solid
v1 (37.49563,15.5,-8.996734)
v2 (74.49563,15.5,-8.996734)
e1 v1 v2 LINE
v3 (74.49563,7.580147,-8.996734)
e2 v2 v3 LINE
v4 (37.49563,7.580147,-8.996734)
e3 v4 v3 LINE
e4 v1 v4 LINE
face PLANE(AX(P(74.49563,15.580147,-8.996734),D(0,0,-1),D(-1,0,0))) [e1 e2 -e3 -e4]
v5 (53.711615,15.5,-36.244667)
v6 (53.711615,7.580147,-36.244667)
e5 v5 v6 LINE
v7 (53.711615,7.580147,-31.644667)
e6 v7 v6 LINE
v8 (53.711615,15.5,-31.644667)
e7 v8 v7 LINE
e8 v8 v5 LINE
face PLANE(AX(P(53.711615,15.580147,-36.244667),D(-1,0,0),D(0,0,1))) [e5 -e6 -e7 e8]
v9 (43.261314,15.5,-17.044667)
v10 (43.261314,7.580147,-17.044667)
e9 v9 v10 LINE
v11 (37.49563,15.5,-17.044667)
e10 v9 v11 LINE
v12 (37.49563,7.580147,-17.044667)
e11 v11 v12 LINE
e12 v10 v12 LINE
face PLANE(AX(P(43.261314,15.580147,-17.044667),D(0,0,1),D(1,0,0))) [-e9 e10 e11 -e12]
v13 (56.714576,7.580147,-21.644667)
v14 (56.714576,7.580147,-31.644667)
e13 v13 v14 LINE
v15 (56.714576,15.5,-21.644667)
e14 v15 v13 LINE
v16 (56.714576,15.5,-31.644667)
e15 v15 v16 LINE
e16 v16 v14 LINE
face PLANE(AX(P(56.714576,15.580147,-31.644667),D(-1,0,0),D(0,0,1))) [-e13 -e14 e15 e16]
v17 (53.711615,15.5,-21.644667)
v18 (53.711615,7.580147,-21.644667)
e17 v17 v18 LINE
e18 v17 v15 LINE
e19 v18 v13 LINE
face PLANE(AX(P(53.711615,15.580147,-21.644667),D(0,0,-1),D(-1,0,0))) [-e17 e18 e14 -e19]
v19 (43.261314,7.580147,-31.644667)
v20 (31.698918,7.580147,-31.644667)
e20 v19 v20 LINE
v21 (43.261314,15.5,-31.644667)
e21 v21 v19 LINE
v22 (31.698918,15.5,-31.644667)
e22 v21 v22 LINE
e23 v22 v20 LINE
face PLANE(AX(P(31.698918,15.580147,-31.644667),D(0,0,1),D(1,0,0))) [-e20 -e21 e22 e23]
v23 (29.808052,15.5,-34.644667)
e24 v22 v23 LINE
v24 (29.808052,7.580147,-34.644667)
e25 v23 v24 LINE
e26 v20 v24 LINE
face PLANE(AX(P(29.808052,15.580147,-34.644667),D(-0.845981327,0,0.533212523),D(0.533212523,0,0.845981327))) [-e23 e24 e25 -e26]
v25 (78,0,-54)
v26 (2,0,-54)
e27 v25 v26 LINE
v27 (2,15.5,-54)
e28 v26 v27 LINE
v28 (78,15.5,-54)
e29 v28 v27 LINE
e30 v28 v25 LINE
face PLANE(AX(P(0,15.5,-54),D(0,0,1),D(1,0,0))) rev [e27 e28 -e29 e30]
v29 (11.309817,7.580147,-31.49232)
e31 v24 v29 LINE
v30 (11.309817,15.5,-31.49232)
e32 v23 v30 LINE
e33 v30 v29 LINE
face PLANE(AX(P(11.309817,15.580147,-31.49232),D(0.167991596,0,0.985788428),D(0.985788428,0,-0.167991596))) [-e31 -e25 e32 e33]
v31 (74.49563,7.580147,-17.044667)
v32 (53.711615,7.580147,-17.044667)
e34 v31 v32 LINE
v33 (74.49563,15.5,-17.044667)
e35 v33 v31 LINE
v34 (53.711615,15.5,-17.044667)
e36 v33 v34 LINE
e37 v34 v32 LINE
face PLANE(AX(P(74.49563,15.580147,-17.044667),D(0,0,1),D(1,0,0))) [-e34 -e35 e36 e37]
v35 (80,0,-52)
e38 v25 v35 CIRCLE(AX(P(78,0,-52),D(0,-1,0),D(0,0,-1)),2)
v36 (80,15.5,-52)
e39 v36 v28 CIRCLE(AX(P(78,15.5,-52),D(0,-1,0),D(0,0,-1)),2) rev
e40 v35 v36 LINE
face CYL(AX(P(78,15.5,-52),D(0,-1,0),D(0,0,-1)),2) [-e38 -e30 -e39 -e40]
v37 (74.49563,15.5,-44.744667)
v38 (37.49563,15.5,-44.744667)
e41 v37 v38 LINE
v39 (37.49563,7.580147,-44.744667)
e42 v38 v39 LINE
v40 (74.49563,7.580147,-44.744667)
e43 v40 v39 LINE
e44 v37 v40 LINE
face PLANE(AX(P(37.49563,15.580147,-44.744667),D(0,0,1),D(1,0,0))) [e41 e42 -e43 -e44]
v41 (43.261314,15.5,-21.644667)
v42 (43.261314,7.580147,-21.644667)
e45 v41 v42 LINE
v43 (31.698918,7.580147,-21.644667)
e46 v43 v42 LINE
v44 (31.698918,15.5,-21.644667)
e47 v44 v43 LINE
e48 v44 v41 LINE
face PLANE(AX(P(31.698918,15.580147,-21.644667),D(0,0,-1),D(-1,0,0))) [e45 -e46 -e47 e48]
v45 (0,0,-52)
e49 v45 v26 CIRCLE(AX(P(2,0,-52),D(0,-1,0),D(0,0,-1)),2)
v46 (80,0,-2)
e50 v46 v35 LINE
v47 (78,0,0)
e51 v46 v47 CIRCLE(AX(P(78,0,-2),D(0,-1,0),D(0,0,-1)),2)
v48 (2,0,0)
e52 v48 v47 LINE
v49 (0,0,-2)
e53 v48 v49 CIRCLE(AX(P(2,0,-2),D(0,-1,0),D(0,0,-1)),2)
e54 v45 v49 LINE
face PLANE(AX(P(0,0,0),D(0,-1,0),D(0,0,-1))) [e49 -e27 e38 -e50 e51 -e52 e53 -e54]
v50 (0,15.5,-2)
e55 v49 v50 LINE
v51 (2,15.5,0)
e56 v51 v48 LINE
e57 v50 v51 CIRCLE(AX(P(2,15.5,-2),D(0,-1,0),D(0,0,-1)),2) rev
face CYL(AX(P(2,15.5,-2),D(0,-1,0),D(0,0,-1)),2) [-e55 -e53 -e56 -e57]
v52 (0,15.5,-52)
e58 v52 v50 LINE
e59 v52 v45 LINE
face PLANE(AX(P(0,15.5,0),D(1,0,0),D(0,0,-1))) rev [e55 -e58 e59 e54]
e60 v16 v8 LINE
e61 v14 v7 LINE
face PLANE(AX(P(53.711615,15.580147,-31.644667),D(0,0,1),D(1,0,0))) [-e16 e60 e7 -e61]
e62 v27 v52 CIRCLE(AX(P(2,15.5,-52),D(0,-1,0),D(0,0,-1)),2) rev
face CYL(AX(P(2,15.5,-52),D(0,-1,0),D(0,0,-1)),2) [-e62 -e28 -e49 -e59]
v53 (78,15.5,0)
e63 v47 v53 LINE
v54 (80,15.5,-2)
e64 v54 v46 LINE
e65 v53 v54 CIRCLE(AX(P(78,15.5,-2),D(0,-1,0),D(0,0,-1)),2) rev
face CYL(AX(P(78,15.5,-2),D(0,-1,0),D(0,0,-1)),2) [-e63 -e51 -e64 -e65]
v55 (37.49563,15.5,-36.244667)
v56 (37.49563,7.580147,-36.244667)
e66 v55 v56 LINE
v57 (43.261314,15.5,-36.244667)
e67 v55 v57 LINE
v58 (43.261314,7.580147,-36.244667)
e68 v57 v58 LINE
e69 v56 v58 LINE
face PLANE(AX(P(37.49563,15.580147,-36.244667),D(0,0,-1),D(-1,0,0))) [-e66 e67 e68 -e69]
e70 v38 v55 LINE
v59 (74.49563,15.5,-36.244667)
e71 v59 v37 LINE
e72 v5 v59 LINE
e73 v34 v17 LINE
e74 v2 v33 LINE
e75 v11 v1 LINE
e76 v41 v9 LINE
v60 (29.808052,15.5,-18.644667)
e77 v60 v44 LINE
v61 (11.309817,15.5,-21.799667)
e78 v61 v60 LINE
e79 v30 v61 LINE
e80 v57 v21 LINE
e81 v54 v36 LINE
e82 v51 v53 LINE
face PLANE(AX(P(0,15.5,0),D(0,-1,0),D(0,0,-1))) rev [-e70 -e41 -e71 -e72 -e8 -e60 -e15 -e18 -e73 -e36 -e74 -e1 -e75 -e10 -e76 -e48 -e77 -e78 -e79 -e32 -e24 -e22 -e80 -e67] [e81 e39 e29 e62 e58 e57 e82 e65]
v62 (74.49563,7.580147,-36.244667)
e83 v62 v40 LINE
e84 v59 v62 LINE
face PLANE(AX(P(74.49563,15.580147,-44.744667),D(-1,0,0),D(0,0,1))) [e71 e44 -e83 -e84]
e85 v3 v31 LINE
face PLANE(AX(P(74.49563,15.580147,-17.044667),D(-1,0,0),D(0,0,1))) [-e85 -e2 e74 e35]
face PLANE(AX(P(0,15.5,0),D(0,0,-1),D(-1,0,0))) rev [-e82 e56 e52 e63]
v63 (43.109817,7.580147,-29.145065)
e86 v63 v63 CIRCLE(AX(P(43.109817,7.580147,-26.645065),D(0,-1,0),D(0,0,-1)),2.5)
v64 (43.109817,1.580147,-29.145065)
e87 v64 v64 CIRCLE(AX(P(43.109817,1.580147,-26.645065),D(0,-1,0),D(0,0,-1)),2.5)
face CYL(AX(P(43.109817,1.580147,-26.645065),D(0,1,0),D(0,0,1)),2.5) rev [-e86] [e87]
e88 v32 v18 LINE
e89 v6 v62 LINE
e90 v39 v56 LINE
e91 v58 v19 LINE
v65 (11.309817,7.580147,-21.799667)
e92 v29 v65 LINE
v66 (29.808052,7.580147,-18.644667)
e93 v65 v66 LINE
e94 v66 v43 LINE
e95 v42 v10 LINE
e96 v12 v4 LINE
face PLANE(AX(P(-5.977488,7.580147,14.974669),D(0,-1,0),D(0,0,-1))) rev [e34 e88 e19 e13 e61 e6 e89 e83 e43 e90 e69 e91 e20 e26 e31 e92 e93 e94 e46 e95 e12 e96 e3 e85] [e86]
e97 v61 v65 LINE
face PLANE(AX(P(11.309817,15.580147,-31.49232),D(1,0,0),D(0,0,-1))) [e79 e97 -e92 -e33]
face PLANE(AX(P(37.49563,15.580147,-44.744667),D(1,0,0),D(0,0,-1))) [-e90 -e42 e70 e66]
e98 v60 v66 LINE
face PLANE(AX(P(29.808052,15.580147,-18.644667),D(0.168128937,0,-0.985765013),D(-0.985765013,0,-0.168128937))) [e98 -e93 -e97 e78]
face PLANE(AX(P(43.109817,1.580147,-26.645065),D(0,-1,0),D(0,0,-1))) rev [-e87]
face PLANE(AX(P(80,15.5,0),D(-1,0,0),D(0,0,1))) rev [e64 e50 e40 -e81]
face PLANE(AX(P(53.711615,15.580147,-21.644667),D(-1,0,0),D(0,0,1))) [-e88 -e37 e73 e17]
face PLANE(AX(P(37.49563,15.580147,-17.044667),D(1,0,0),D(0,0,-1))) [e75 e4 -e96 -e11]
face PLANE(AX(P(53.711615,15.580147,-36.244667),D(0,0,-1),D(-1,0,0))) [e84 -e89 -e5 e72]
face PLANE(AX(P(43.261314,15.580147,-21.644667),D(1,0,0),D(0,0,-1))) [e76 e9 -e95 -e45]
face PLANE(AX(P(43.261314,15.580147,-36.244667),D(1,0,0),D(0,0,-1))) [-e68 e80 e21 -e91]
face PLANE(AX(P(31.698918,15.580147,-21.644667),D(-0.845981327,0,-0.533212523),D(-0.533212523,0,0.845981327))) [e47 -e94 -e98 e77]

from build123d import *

# Parameters (mm, degrees)
SKETCH1_W           = 80
SKETCH1_H           = 54
BOSS_EXTRUDE2_DEPTH = 15.5
FILLET1_R           = 2
Y_WING_START        = -26.76167351
Y_WING_DEPTH        = 8
Y_WING_START_2      = -32.76167351
Y_WING_2_OUTLINE_R  = 2.5
Y_WING_2_DEPTH      = 6


with BuildPart() as part:
    # Sketch1 → Boss-Extrude2 (new body)
    with BuildSketch(Plane(origin=(0, 0, 0), x_dir=(1, 0, 0), z_dir=(0, 1, 0))):
        with Locations((40, 27)):
            Rectangle(SKETCH1_W, SKETCH1_H)
    extrude(amount=BOSS_EXTRUDE2_DEPTH)

    # Fillet1
    fillet1_edges = [part.edges().sort_by_distance(p)[0] for p in [
        (0, 7.75, -54),
        (80, 7.75, -54),
        (80, 7.75, 0),
        (0, 7.75, 0),
    ]]
    fillet(fillet1_edges, radius=FILLET1_R)


with BuildPart() as body_2:
    # Y-Wing: read off the stored shape, not the designer's step
    # Y-Wing outline → Y-Wing (new body)
    with BuildSketch(Plane(origin=(0, 0, 0), x_dir=(1, 0, 0), z_dir=(0, 1, 0)).offset(Y_WING_START)):
        Polygon((-37.998848216, 80.77793428), (-49.561243891, 80.77793428), (-51.452110178, 83.77793428), (-69.950345376, 80.625586413), (-69.950345376, 70.93293428), (-51.452110178, 67.77793428), (-49.561243891, 70.77793428), (-37.998848216, 70.77793428), (-37.998848216, 66.17793428), (-43.764531914, 66.17793428), (-43.764531914, 58.130000785), (-6.764531914, 58.130000785), (-6.764531914, 66.17793428), (-27.548546514, 66.17793428), (-27.548546514, 70.77793428), (-24.545586254, 70.77793428), (-24.545586254, 80.77793428), (-27.548546514, 80.77793428), (-27.548546514, 85.37793428), (-6.764531914, 85.37793428), (-6.764531914, 93.87793428), (-43.764531914, 93.87793428), (-43.764531914, 85.37793428), (-37.998848216, 85.37793428), align=None)
    extrude(amount=Y_WING_DEPTH)

    # Y-Wing 2 outline → Y-Wing 2 (add)
    with BuildSketch(Plane(origin=(0, 0, 0), x_dir=(1, 0, 0), z_dir=(0, 1, 0)).offset(Y_WING_START_2)):
        with Locations((-38.150345376, 75.778331613)):
            Circle(Y_WING_2_OUTLINE_R)
    extrude(amount=Y_WING_2_DEPTH)


with BuildPart() as body_2_1:
    # Body-Move/Copy3: moved
    add(body_2.part.moved(Location((81.260162004, 34.341820547, 49.133266847))))


with BuildPart() as part_1:
    add(part.part)

    # Intersect1: read off the stored shape, not the designer's step
    # Intersect1: cut body 2
    add(body_2_1.part, mode=Mode.SUBTRACT)


solid = part_1.part
